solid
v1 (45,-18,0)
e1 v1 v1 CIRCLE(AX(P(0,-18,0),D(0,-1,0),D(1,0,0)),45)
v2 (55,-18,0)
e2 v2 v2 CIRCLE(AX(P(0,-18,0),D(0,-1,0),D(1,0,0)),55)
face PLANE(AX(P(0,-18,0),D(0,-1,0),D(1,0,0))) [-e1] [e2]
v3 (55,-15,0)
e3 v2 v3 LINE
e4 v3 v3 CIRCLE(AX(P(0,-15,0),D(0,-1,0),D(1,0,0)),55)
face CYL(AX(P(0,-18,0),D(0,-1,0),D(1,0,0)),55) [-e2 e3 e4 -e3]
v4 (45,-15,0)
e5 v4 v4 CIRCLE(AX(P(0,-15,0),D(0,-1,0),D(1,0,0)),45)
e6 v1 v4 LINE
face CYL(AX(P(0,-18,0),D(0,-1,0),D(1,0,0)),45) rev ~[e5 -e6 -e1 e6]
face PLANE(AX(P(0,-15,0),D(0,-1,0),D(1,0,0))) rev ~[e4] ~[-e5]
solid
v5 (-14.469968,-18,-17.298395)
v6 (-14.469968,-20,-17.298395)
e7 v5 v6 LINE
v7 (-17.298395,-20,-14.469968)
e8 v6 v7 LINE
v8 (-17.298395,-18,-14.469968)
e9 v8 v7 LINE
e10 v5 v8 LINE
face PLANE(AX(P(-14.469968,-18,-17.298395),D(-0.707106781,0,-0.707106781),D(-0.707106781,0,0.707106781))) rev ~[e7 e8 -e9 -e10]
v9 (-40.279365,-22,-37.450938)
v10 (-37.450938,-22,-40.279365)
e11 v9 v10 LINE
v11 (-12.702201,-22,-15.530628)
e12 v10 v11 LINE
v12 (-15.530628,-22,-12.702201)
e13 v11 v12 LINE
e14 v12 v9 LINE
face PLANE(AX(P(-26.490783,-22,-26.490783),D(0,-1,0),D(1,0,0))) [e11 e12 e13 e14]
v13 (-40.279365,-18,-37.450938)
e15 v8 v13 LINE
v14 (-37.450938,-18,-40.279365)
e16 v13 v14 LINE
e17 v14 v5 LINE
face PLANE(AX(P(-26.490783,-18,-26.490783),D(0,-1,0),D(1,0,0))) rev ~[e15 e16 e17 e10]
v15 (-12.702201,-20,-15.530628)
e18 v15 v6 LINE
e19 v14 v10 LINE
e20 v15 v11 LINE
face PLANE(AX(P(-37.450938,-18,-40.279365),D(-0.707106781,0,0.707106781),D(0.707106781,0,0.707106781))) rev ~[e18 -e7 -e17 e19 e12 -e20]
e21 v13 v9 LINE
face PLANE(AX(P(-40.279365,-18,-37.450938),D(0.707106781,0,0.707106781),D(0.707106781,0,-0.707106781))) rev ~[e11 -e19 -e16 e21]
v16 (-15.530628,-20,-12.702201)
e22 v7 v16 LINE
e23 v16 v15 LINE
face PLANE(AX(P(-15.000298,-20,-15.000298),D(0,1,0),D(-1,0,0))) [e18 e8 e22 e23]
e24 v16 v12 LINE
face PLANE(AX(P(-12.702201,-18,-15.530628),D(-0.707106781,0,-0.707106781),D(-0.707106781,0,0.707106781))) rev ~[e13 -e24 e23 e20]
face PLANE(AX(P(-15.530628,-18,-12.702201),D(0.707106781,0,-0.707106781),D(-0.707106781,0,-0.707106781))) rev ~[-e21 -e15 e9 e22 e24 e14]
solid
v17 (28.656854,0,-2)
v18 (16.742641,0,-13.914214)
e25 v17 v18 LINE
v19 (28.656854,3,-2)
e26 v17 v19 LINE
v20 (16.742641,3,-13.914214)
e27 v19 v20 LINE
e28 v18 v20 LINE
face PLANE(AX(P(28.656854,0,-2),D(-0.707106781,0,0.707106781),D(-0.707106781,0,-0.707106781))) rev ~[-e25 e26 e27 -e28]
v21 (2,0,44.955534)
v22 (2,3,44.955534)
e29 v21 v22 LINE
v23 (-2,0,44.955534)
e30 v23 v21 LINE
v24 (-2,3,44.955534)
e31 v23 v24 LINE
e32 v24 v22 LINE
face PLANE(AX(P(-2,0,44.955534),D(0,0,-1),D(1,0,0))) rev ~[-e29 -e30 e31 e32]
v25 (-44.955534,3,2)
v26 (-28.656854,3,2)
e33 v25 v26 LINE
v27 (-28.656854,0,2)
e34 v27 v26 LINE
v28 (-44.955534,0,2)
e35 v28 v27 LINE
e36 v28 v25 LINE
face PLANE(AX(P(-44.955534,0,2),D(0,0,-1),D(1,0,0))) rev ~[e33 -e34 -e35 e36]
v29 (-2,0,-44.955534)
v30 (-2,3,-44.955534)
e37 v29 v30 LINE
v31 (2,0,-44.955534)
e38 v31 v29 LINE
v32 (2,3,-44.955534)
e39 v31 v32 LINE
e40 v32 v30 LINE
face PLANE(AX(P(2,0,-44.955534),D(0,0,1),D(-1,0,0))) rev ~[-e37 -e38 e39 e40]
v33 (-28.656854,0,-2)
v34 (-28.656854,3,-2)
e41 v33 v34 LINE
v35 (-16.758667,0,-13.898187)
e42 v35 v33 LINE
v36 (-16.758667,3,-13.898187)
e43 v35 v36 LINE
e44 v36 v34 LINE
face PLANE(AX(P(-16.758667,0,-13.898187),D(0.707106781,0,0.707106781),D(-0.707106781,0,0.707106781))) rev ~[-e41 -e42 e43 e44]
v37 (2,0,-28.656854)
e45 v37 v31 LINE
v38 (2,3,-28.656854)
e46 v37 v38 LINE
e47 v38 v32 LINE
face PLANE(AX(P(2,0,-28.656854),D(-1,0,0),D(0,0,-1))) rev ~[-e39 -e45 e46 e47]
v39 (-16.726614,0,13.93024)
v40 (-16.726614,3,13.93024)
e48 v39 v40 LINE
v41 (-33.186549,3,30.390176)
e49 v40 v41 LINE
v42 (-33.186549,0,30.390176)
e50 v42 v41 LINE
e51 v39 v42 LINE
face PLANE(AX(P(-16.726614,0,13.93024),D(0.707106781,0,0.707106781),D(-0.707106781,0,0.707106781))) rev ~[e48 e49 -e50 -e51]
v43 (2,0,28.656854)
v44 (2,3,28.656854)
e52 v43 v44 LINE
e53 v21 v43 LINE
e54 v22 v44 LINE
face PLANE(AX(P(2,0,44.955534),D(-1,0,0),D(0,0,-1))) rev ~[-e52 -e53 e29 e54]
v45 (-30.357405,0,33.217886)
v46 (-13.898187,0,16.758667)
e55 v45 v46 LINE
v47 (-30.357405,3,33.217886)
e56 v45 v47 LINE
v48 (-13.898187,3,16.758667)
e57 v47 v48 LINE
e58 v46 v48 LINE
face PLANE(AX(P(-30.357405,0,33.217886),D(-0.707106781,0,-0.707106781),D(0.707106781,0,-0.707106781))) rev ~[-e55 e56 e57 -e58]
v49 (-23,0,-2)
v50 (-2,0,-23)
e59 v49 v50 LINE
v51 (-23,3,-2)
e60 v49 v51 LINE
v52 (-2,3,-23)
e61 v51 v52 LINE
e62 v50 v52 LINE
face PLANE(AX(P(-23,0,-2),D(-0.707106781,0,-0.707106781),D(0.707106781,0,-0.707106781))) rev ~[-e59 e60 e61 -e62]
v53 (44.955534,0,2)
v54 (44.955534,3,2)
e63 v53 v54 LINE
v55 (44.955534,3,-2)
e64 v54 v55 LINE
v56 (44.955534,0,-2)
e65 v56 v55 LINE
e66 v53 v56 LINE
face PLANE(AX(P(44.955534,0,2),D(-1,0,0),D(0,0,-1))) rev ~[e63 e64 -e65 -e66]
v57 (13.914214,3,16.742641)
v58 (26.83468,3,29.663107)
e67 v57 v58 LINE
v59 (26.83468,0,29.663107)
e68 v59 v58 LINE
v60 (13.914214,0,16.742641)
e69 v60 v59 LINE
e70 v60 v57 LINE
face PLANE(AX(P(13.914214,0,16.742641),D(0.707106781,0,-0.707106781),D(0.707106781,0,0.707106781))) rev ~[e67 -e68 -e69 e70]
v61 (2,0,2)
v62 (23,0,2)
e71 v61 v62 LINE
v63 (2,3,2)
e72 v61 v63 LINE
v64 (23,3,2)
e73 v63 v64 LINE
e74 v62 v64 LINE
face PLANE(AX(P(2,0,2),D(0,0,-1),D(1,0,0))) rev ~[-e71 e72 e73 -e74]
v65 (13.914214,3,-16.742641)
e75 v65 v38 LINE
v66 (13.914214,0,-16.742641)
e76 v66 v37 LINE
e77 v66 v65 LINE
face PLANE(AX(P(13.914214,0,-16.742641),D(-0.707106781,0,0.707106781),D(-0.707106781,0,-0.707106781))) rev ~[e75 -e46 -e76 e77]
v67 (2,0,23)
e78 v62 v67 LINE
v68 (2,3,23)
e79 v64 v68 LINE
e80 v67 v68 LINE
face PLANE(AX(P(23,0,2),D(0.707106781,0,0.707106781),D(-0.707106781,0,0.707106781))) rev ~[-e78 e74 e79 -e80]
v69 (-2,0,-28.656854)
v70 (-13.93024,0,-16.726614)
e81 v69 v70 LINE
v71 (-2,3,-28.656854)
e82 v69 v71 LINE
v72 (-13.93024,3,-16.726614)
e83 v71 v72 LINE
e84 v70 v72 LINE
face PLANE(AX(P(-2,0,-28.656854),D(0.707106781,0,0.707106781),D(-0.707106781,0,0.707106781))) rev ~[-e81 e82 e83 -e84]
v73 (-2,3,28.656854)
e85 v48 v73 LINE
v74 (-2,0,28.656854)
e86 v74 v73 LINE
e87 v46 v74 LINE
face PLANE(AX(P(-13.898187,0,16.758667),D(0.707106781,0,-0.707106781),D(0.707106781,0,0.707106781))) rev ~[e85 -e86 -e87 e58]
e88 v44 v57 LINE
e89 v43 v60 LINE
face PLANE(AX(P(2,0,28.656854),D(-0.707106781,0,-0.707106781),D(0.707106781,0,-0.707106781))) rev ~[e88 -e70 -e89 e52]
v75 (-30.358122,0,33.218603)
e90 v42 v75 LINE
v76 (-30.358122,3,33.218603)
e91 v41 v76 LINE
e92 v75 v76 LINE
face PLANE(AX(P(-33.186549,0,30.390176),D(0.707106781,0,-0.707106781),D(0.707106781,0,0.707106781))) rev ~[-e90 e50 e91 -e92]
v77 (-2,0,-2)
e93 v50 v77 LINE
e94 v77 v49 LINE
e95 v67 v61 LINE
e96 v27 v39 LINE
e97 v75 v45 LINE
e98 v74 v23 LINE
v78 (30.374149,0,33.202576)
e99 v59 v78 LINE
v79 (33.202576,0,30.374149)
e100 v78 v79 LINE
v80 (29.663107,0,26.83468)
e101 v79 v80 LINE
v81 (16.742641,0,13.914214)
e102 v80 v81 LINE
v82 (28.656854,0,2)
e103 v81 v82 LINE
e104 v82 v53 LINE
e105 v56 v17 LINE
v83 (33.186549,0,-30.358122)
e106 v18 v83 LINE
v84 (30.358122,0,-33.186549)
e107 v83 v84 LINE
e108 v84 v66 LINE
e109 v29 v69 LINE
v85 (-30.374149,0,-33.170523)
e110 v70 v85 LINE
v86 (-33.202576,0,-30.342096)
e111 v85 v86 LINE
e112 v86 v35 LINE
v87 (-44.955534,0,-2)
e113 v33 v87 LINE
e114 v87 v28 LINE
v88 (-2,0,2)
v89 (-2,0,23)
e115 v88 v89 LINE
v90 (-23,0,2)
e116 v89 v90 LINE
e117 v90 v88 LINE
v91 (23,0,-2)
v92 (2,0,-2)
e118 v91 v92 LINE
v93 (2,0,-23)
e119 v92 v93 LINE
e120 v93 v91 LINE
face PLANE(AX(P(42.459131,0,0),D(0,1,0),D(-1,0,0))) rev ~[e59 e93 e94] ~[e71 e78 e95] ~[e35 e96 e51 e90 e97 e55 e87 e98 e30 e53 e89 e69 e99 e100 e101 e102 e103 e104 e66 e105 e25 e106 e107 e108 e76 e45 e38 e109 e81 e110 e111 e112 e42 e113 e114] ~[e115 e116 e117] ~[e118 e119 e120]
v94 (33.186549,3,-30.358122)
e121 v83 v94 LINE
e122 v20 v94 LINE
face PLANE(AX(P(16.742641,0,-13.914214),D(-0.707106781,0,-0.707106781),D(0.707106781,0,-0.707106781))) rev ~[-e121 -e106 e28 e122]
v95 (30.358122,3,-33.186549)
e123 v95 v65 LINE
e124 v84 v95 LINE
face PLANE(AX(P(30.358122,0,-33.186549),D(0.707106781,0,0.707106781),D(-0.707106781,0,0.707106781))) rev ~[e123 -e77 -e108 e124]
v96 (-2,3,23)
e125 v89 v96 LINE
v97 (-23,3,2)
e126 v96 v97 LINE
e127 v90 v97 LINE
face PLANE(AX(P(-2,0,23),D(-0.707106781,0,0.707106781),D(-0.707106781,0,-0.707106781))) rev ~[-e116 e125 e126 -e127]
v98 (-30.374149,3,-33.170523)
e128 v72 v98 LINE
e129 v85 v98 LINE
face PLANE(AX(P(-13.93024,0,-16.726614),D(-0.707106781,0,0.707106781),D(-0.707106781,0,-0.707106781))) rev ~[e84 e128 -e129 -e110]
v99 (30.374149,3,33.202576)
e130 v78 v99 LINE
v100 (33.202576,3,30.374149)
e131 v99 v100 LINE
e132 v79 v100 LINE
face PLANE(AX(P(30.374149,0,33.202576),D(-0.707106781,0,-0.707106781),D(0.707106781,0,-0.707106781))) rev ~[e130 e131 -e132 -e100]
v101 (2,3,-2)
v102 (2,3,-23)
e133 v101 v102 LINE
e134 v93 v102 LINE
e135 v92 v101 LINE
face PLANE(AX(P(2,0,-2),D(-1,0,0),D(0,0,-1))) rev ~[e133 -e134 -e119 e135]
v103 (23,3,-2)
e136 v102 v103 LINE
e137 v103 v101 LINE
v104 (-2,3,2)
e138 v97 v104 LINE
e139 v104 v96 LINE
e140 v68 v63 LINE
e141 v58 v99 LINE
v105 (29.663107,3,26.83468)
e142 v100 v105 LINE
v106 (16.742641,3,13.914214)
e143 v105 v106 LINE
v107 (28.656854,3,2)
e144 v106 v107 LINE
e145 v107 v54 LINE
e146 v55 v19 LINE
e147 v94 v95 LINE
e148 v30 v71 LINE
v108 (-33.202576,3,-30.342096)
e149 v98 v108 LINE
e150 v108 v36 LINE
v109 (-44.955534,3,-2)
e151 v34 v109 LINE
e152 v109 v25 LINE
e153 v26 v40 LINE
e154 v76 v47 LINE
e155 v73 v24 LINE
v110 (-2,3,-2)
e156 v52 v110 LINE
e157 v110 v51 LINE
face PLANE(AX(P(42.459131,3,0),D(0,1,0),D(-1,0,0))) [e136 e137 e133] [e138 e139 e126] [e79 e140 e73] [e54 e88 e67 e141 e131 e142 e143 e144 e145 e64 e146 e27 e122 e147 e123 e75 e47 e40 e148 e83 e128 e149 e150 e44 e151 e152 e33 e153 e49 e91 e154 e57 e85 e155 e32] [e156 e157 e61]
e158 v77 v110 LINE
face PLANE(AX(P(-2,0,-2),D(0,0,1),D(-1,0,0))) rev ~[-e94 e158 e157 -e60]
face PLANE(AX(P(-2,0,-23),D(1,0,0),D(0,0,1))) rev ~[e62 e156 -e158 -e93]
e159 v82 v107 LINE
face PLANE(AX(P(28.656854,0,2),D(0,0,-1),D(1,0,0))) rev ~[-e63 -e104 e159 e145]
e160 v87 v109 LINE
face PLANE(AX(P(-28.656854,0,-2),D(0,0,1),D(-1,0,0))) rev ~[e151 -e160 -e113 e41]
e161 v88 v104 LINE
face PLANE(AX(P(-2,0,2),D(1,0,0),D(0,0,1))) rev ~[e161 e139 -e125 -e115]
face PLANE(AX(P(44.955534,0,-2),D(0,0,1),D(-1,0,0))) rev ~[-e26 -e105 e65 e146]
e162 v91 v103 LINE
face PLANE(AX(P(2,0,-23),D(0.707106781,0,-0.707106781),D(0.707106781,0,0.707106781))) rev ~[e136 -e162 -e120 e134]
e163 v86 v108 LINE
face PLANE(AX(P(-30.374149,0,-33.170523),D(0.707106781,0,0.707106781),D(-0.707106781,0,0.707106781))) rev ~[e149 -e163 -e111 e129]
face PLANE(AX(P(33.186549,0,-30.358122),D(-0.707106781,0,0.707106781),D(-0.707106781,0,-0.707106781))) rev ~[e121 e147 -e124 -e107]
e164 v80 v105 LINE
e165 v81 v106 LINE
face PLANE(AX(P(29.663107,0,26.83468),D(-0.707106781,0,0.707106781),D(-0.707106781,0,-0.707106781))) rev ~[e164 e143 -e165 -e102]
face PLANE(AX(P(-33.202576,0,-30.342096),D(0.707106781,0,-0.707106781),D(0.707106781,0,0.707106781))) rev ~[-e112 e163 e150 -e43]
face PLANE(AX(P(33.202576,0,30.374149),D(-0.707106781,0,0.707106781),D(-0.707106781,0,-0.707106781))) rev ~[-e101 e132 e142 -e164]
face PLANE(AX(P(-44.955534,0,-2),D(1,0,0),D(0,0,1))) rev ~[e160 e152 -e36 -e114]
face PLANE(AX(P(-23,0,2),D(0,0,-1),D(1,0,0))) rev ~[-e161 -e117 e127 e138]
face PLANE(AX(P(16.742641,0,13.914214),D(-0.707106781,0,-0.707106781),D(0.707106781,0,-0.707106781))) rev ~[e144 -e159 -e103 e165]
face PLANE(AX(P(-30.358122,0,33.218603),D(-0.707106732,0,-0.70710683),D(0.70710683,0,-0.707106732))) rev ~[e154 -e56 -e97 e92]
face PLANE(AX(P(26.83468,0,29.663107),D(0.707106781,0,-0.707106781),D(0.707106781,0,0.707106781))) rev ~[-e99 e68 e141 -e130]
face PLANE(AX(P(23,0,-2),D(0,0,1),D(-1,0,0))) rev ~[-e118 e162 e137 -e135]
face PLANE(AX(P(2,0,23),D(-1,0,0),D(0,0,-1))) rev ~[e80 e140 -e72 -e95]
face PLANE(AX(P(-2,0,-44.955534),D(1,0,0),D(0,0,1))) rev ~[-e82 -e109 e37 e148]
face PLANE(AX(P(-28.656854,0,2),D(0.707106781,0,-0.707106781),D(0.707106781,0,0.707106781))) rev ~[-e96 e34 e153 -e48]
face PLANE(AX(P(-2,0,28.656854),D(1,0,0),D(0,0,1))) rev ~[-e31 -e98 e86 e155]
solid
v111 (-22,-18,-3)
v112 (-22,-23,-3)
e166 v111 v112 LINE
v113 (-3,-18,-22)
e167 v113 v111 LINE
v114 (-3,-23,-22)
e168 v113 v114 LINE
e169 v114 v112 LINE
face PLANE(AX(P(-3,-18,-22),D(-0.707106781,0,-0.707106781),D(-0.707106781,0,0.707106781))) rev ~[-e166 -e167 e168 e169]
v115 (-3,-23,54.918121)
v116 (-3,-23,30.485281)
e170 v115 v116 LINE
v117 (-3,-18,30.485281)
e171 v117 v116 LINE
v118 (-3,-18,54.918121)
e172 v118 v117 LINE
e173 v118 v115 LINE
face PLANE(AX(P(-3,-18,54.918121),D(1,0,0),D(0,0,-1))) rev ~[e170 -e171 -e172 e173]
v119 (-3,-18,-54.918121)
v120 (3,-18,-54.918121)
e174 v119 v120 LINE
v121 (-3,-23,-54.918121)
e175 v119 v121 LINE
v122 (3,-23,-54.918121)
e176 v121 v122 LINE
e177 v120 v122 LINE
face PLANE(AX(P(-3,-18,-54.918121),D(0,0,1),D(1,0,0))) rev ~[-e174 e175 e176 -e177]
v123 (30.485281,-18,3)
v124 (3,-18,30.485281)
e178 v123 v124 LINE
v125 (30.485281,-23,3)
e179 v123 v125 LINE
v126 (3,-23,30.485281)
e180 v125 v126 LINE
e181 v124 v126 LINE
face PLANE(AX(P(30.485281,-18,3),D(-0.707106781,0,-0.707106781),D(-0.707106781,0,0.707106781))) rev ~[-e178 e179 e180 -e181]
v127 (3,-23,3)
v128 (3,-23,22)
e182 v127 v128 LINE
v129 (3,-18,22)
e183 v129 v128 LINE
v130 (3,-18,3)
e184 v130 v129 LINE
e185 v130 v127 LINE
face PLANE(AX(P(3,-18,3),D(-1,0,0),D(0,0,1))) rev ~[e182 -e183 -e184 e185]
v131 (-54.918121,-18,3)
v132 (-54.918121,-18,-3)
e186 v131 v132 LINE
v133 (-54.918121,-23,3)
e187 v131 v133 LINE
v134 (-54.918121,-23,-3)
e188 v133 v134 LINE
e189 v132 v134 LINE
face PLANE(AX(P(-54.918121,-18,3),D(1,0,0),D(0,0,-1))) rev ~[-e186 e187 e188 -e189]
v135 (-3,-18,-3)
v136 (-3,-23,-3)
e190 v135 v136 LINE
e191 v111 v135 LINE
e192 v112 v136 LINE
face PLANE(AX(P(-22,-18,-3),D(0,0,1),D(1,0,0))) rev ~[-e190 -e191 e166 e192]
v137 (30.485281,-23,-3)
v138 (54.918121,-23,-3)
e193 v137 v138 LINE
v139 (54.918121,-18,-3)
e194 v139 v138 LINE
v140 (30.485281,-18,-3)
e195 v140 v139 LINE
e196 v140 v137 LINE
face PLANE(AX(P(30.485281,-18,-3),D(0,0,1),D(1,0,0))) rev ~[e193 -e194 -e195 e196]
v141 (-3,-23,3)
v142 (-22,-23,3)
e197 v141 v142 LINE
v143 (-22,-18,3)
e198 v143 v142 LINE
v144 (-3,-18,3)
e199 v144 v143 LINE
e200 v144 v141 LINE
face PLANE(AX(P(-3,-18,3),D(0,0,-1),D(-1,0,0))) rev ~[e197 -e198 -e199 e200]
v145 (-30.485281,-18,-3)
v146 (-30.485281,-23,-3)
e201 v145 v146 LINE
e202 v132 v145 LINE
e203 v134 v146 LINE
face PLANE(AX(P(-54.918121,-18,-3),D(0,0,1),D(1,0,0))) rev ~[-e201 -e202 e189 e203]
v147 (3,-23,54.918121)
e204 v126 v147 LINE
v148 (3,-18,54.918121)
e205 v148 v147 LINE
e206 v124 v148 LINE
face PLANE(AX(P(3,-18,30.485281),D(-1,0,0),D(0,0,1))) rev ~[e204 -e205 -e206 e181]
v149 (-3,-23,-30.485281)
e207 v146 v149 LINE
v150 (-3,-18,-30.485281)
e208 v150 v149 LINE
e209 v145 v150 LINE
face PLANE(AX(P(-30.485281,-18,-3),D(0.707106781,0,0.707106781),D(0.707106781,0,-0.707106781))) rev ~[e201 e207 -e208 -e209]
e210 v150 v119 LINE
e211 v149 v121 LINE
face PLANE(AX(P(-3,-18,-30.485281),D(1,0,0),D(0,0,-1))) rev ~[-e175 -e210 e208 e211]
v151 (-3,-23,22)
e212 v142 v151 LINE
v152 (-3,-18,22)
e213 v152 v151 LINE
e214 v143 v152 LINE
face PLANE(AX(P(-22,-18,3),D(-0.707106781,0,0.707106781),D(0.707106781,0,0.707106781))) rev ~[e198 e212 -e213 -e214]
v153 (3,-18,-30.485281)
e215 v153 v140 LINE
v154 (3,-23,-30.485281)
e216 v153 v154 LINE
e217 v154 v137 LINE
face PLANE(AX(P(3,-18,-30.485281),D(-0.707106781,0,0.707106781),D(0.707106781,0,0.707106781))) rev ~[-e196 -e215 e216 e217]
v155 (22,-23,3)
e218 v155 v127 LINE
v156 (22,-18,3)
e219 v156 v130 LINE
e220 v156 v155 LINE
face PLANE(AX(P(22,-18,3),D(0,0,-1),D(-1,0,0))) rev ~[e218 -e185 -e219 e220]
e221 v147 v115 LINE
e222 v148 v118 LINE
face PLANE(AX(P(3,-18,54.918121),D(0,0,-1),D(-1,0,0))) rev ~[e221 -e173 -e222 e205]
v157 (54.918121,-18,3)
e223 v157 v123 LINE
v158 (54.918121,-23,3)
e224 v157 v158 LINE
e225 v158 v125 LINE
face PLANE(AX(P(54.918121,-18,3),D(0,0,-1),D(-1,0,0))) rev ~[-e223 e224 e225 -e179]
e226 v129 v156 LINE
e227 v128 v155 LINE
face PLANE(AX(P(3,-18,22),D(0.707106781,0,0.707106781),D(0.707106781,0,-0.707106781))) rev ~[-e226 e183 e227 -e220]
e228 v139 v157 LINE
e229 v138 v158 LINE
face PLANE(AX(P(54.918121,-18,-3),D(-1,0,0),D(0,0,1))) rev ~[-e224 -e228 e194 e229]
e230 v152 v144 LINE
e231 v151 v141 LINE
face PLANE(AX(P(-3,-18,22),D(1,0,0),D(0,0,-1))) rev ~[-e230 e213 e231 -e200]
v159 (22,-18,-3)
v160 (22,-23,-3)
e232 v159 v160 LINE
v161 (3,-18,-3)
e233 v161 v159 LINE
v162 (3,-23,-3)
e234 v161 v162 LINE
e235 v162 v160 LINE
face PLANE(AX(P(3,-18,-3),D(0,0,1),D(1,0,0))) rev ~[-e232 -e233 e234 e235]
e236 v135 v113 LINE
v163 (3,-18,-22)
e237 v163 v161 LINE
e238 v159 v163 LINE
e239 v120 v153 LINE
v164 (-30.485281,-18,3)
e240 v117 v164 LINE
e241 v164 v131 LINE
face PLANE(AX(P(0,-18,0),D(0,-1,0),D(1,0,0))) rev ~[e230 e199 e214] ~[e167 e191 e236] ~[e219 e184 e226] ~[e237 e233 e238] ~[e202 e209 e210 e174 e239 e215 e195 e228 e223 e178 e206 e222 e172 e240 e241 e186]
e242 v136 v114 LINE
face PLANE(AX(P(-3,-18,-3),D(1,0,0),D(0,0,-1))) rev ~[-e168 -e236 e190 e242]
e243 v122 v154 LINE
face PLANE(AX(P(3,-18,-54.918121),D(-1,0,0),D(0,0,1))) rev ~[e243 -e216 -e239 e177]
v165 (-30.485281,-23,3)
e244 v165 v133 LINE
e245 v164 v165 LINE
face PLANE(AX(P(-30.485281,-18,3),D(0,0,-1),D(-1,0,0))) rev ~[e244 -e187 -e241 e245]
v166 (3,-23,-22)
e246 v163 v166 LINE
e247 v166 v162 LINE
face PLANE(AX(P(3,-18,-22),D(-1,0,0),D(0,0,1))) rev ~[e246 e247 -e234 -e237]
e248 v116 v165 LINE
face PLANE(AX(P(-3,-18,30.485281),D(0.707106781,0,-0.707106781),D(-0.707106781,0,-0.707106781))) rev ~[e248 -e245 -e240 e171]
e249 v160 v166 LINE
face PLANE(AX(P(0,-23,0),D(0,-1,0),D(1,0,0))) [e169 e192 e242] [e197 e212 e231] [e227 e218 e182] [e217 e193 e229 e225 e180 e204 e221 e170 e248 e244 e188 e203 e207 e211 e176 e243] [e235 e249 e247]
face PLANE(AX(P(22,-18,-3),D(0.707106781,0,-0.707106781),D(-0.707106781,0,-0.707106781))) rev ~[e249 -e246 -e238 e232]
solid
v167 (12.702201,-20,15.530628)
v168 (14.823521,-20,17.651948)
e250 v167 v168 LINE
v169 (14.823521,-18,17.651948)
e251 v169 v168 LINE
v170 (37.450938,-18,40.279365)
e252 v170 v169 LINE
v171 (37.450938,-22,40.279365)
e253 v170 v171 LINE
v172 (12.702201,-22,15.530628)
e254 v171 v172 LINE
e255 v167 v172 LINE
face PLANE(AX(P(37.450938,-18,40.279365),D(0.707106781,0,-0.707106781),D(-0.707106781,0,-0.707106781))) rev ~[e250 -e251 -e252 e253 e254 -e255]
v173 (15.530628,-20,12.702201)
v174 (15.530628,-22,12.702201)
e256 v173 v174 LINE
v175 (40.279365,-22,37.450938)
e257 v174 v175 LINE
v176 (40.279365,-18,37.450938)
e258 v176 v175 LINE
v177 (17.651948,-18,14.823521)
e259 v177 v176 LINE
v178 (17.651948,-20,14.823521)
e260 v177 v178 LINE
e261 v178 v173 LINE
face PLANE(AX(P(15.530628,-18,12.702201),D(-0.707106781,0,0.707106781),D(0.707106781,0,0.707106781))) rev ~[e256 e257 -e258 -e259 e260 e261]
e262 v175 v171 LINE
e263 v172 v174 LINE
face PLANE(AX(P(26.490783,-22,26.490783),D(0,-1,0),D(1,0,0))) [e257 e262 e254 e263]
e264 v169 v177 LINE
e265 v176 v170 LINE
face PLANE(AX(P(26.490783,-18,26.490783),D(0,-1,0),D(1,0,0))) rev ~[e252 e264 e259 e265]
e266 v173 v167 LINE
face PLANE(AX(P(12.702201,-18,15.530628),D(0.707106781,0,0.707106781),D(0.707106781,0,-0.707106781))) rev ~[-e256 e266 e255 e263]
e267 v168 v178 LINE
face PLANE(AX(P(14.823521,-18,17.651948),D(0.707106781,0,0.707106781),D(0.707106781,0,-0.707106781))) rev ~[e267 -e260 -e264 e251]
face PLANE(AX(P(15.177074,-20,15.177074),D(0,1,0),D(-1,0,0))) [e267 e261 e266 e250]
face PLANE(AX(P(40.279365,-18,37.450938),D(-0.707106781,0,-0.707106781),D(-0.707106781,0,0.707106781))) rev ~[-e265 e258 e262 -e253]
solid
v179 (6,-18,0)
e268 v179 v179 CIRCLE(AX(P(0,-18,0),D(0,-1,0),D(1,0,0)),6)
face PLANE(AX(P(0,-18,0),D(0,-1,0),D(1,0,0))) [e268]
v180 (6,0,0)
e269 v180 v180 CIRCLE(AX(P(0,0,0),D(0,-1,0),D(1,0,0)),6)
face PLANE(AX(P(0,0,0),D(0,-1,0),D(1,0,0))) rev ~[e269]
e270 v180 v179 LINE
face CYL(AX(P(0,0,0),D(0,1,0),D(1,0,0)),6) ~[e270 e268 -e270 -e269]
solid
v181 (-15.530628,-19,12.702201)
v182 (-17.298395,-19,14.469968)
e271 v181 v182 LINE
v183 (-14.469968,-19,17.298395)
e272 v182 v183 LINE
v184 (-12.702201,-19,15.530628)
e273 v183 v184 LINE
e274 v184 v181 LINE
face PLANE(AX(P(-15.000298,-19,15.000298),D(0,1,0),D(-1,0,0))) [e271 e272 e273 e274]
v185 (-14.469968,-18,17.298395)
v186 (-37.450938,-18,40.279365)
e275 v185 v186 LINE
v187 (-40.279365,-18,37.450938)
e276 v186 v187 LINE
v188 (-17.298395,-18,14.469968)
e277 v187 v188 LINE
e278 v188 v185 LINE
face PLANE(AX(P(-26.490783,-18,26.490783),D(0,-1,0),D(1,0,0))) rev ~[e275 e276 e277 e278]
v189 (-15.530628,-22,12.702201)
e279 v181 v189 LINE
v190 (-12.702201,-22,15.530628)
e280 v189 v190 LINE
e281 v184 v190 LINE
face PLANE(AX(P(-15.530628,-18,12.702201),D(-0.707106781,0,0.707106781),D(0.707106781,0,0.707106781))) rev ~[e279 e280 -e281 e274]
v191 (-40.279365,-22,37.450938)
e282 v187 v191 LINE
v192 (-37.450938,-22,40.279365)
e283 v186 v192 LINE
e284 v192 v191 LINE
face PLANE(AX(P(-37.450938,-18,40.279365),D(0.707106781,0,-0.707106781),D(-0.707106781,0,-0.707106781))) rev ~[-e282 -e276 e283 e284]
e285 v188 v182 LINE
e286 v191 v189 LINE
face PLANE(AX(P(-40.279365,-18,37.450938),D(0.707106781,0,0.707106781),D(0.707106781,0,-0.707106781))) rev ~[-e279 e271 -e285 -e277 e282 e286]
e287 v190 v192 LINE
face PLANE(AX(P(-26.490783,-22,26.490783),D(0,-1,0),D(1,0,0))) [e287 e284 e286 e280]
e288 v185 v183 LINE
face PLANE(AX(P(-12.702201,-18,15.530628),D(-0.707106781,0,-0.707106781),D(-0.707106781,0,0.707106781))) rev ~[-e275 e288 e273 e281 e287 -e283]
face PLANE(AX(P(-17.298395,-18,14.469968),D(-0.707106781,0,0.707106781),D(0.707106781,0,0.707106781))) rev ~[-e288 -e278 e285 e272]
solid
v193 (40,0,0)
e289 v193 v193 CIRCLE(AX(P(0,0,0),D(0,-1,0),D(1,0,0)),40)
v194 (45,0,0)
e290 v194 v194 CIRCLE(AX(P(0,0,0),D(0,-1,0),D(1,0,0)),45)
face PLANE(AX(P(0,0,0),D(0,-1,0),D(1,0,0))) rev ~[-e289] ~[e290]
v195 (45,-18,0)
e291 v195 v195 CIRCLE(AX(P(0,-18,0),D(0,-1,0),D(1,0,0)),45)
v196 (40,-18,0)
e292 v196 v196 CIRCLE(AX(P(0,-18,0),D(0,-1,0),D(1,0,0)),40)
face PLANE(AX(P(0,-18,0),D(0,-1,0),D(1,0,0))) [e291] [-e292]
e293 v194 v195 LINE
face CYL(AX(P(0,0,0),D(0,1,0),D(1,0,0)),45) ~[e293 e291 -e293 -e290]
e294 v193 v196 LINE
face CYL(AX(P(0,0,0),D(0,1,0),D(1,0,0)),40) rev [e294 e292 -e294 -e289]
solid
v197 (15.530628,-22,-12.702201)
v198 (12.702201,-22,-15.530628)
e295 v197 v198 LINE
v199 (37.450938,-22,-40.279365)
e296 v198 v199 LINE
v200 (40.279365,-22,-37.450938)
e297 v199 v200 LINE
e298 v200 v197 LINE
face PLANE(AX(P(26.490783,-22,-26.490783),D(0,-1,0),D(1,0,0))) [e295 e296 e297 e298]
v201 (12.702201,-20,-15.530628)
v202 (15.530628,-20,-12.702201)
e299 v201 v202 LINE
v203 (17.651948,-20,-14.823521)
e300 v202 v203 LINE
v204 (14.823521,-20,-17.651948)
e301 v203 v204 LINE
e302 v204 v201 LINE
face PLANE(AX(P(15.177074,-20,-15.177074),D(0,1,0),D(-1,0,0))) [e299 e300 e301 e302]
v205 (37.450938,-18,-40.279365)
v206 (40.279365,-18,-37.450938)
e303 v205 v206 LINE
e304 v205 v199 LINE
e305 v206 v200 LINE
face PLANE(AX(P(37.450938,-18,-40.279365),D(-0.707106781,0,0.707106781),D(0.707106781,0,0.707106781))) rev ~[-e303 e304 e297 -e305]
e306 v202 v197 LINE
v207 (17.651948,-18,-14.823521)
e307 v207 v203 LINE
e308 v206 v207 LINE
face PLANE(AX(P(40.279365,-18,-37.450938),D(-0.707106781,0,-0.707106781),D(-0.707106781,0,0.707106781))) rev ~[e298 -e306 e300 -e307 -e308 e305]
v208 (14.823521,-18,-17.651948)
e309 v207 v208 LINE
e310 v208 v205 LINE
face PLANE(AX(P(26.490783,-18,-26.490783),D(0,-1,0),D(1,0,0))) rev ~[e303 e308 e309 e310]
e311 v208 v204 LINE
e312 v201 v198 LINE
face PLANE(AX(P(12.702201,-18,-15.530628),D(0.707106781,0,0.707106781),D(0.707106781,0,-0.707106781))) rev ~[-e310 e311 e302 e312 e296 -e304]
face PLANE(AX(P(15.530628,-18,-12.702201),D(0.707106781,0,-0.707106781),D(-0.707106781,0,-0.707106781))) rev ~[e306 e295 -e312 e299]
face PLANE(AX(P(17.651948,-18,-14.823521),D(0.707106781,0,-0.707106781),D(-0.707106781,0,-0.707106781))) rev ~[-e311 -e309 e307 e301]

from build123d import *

# Parameters (mm, degrees)
F0_R      = 6
F1_DEPTH  = 18
F0_R_2    = 45
F0_R_3    = 40
F2_R      = 55
F2_R_2    = 45
F3_DEPTH  = 3
F4_W      = 6
F4_H      = 6
F5_DEPTH  = 5
F7_DEPTH  = 4
F9_DEPTH  = 1
F11_DEPTH = 2
F13_DEPTH = 2
F15_DEPTH = 2
F16_W     = 4
F16_H     = 4
F17_DEPTH = 3


with BuildPart() as f1:
    # F0 (on Front) → F1 (new body)
    with BuildSketch(Plane.XZ):
        Circle(F0_R)
    extrude(amount=F1_DEPTH)


with BuildPart() as f1b:
    # F0 (on Front) → F1, piece 2 (new body)
    with BuildSketch(Plane.XZ):
        Circle(F0_R_2)
        Circle(F0_R_3, mode=Mode.SUBTRACT)
    extrude(amount=F1_DEPTH)


with BuildPart() as f3:
    # F2 (on face) → F3 (new body)
    with BuildSketch(Plane.XZ.offset(18)):
        Circle(F2_R)
        Circle(F2_R_2, mode=Mode.SUBTRACT)
    extrude(amount=-F3_DEPTH)


with BuildPart() as f5:
    # F4 (on face) → F5 (new body)
    with BuildSketch(Plane.XZ.offset(18)):
        Rectangle(F4_W, F4_H)
        with BuildLine():
            Line((-54.918120871, 3), (-54.918120871, -3))
            Line((-54.918120871, -3), (-44.8998886413, -3))
            ThreePointArc((-44.8998886413, -3), (-45, 0), (-44.8998886413, 3))
            Line((-44.8998886413, 3), (-54.918120871, 3))
        make_face()
        Polygon((-25, 0), (-22, -3), (-3, -3), (-3, 3), (-22, 3), align=None)
        Polygon((3, -3), (-3, -3), (-3, -22), (0, -25), (3, -22), align=None)
        Polygon((3, 3), (3, -3), (22, -3), (25, 0), (22, 3), align=None)
        with BuildLine():
            Line((44.8998886413, -3), (54.918120871, -3))
            Line((54.918120871, -3), (54.918120871, 3))
            Line((54.918120871, 3), (44.8998886413, 3))
            ThreePointArc((44.8998886413, 3), (44.9749651965, 1.500834958), (45, 0))
            ThreePointArc((45, 0), (44.9749651965, -1.500834958), (44.8998886413, -3))
        make_face()
        with BuildLine():
            Line((3, 54.918120871), (-3, 54.918120871))
            Line((-3, 54.918120871), (-3, 44.8998886413))
            ThreePointArc((-3, 44.8998886413), (0, 45), (3, 44.8998886413))
            Line((3, 44.8998886413), (3, 54.918120871))
        make_face()
        with BuildLine():
            Line((-3, -44.8998886413), (-3, -54.918120871))
            Line((-3, -54.918120871), (3, -54.918120871))
            Line((3, -54.918120871), (3, -44.8998886413))
            ThreePointArc((3, -44.8998886413), (0, -45), (-3, -44.8998886413))
        make_face()
        Polygon((-3, 22), (-3, 3), (3, 3), (3, 22), (0, 25), align=None)
        with BuildLine():
            ThreePointArc((-44.8998886413, 3), (-45, 0), (-44.8998886413, -3))
            Line((-44.8998886413, -3), (-30.4852813742, -3))
            Line((-30.4852813742, -3), (-33.4852813742, 0))
            Line((-33.4852813742, 0), (-30.4852813742, 3))
            Line((-30.4852813742, 3), (-44.8998886413, 3))
        make_face()
        Polygon((-33.4852813742, 0), (-30.4852813742, -3), (-22, -3), (-25, 0), (-22, 3), (-30.4852813742, 3), align=None)
        Polygon((-3, 30.4852813742), (-30.4852813742, 3), (-22, 3), (-3, 22), align=None)
        Polygon((-22, -3), (-30.4852813742, -3), (-3, -30.4852813742), (-3, -22), align=None)
        Polygon((3, -22), (3, -30.4852813742), (30.4852813742, -3), (22, -3), align=None)
        Polygon((-3, -22), (-3, -30.4852813742), (0, -33.4852813742), (3, -30.4852813742), (3, -22), (0, -25), align=None)
        with BuildLine():
            Line((-3, -30.4852813742), (-3, -44.8998886413))
            ThreePointArc((-3, -44.8998886413), (0, -45), (3, -44.8998886413))
            Line((3, -44.8998886413), (3, -30.4852813742))
            Line((3, -30.4852813742), (0, -33.4852813742))
            Line((0, -33.4852813742), (-3, -30.4852813742))
        make_face()
        Polygon((30.4852813742, 3), (3, 30.4852813742), (3, 22), (22, 3), align=None)
        Polygon((22, -3), (30.4852813742, -3), (33.4852813742, 0), (30.4852813742, 3), (22, 3), (25, 0), align=None)
        Polygon((0, 33.4852813742), (-3, 30.4852813742), (-3, 22), (0, 25), (3, 22), (3, 30.4852813742), align=None)
        with BuildLine():
            ThreePointArc((3, 44.8998886413), (0, 45), (-3, 44.8998886413))
            Line((-3, 44.8998886413), (-3, 30.4852813742))
            Line((-3, 30.4852813742), (0, 33.4852813742))
            Line((0, 33.4852813742), (3, 30.4852813742))
            Line((3, 30.4852813742), (3, 44.8998886413))
        make_face()
        with BuildLine():
            Line((30.4852813742, -3), (44.8998886413, -3))
            ThreePointArc((44.8998886413, -3), (44.9749651965, -1.500834958), (45, 0))
            ThreePointArc((45, 0), (44.9749651965, 1.500834958), (44.8998886413, 3))
            Line((44.8998886413, 3), (30.4852813742, 3))
            Line((30.4852813742, 3), (33.4852813742, 0))
            Line((33.4852813742, 0), (30.4852813742, -3))
        make_face()
    extrude(amount=F5_DEPTH)


with BuildPart() as f7:
    # F6 (on face) → F7 (new body)
    with BuildSketch(Plane.XZ.offset(18)):
        Polygon((-40.279365048, 37.4509379232), (-15.5306277065, 12.7022005817), (-12.7022005817, 15.5306277065), (-37.4509379232, 40.279365048), align=None)
    extrude(amount=F7_DEPTH)

    # F8 (on face) → F9 (cut)
    with BuildSketch(Plane(origin=(0, -18, 0), x_dir=(-1, 0, 0), z_dir=(0, 1, 0))):
        Polygon((17.2983946594, 14.4699675347), (14.4699675347, 17.2983946594), (12.7022005817, 15.5306277065), (15.5306277065, 12.7022005817), align=None)
    extrude(amount=-F9_DEPTH, mode=Mode.SUBTRACT)


with BuildPart() as f7b:
    # F6 (on face) → F7, piece 2 (new body)
    with BuildSketch(Plane.XZ.offset(18)):
        Polygon((-15.5306277065, -12.7022005817), (-40.279365048, -37.4509379232), (-37.4509379232, -40.279365048), (-12.7022005817, -15.5306277065), align=None)
    extrude(amount=F7_DEPTH)

    # F10 (on face) → F11 (cut)
    with BuildSketch(Plane(origin=(0, -18, 0), x_dir=(-1, 0, 0), z_dir=(0, 1, 0))):
        Polygon((17.2983946594, -14.4699675347), (15.5306277065, -12.7022005817), (12.7022005817, -15.5306277065), (14.4699675347, -17.2983946594), align=None)
    extrude(amount=-F11_DEPTH, mode=Mode.SUBTRACT)


with BuildPart() as f7c:
    # F6 (on face) → F7, piece 3 (new body)
    with BuildSketch(Plane.XZ.offset(18)):
        Polygon((12.7022005817, -15.5306277065), (37.4509379232, -40.279365048), (40.279365048, -37.4509379232), (15.5306277065, -12.7022005817), align=None)
    extrude(amount=F7_DEPTH)

    # F12 (on face) → F13 (cut)
    with BuildSketch(Plane(origin=(0, -18, 0), x_dir=(-1, 0, 0), z_dir=(0, 1, 0))):
        Polygon((-14.8235209253, -17.65194805), (-12.7022005817, -15.5306277065), (-15.5306277065, -12.7022005817), (-17.65194805, -14.8235209253), align=None)
    extrude(amount=-F13_DEPTH, mode=Mode.SUBTRACT)


with BuildPart() as f7d:
    # F6 (on face) → F7, piece 4 (new body)
    with BuildSketch(Plane.XZ.offset(18)):
        Polygon((15.5306277065, 12.7022005817), (40.279365048, 37.4509379232), (37.4509379232, 40.279365048), (12.7022005817, 15.5306277065), align=None)
    extrude(amount=F7_DEPTH)

    # F14 (on face) → F15 (cut)
    with BuildSketch(Plane(origin=(0, -18, 0), x_dir=(-1, 0, 0), z_dir=(0, 1, 0))):
        Polygon((-15.5306277065, 12.7022005817), (-12.7022005817, 15.5306277065), (-14.8235209253, 17.65194805), (-17.65194805, 14.8235209253), align=None)
    extrude(amount=-F15_DEPTH, mode=Mode.SUBTRACT)


with BuildPart() as f17:
    # F16 (on face) → F17 (new body)
    with BuildSketch(Plane(origin=(0, 0, 0), x_dir=(-1, 0, 0), z_dir=(0, 1, 0))):
        with BuildLine():
            Line((-44.955533586, 2), (-44.955533586, -2))
            Line((-44.955533586, -2), (-39.9499687109, -2))
            ThreePointArc((-39.9499687109, -2), (-40, 0), (-39.9499687109, 2))
            Line((-39.9499687109, 2), (-44.955533586, 2))
        make_face()
        with BuildLine():
            ThreePointArc((-39.9499687109, 2), (-40, 0), (-39.9499687109, -2))
            Line((-39.9499687109, -2), (-28.6568542495, -2))
            Line((-28.6568542495, -2), (-30.6568542495, 0))
            Line((-30.6568542495, 0), (-28.6568542495, 2))
            Line((-28.6568542495, 2), (-39.9499687109, 2))
        make_face()
        with BuildLine():
            Line((-2, -39.9499687109), (-2, -44.955533586))
            Line((-2, -44.955533586), (2, -44.955533586))
            Line((2, -44.955533586), (2, -39.9499687109))
            ThreePointArc((2, -39.9499687109), (0, -40), (-2, -39.9499687109))
        make_face()
        Polygon((-30.6568542495, 0), (-28.6568542495, -2), (-23, -2), (-25, 0), (-23, 2), (-28.6568542495, 2), align=None)
        Polygon((-23, -2), (-28.6568542495, -2), (-16.7426406871, -13.9142135624), (-13.9142135624, -16.7426406871), (-2, -28.6568542495), (-2, -23), align=None)
        with BuildLine():
            ThreePointArc((-26.8346802213, -29.663107346), (-28.2842712475, -28.2842712475), (-29.663107346, -26.8346802213))
            Line((-29.663107346, -26.8346802213), (-33.1865494443, -30.3581223196))
            Line((-33.1865494443, -30.3581223196), (-30.3581223196, -33.1865494443))
            Line((-30.3581223196, -33.1865494443), (-26.8346802213, -29.663107346))
        make_face()
        with BuildLine():
            Line((-16.7426406871, -13.9142135624), (-29.663107346, -26.8346802213))
            ThreePointArc((-29.663107346, -26.8346802213), (-28.2842712475, -28.2842712475), (-26.8346802213, -29.663107346))
            Line((-26.8346802213, -29.663107346), (-13.9142135624, -16.7426406871))
            Line((-13.9142135624, -16.7426406871), (-16.7426406871, -13.9142135624))
        make_face()
        with BuildLine():
            Line((-30.3741490881, 33.2025762129), (-33.2025762129, 30.3741490881))
            Line((-33.2025762129, 30.3741490881), (-29.663107346, 26.8346802213))
            ThreePointArc((-29.663107346, 26.8346802213), (-28.2842712475, 28.2842712475), (-26.8346802213, 29.663107346))
            Line((-26.8346802213, 29.663107346), (-30.3741490881, 33.2025762129))
        make_face()
        with BuildLine():
            Line((-2, -28.6568542495), (-2, -39.9499687109))
            ThreePointArc((-2, -39.9499687109), (0, -40), (2, -39.9499687109))
            Line((2, -39.9499687109), (2, -28.6568542495))
            Line((2, -28.6568542495), (0, -30.6568542495))
            Line((0, -30.6568542495), (-2, -28.6568542495))
        make_face()
        Polygon((-25, 0), (-23, -2), (-2, -2), (-2, 2), (-23, 2), align=None)
        Polygon((-16.7426406871, 13.9142135624), (-28.6568542495, 2), (-23, 2), (-2, 23), (-2, 28.6568542495), (-13.9142135624, 16.7426406871), align=None)
        with BuildLine():
            ThreePointArc((-26.8346802213, 29.663107346), (-28.2842712475, 28.2842712475), (-29.663107346, 26.8346802213))
            Line((-29.663107346, 26.8346802213), (-16.7426406871, 13.9142135624))
            Line((-16.7426406871, 13.9142135624), (-13.9142135624, 16.7426406871))
            Line((-13.9142135624, 16.7426406871), (-26.8346802213, 29.663107346))
        make_face()
        with BuildLine():
            Line((39.9499687109, -2), (44.955533586, -2))
            Line((44.955533586, -2), (44.955533586, 2))
            Line((44.955533586, 2), (39.9499687109, 2))
            ThreePointArc((39.9499687109, 2), (39.9874902215, 1.0003128423), (40, 0))
            ThreePointArc((40, 0), (39.9874902215, -1.0003128423), (39.9499687109, -2))
        make_face()
        Polygon((-2, -23), (-2, -28.6568542495), (0, -30.6568542495), (2, -28.6568542495), (2, -23), (0, -25), align=None)
        Rectangle(F16_W, F16_H)
        Polygon((2, -2), (-2, -2), (-2, -23), (0, -25), (2, -23), align=None)
        with BuildLine():
            Line((2, 44.955533586), (-2, 44.955533586))
            Line((-2, 44.955533586), (-2, 39.9499687109))
            ThreePointArc((-2, 39.9499687109), (0, 40), (2, 39.9499687109))
            Line((2, 39.9499687109), (2, 44.955533586))
        make_face()
        Polygon((2, -23), (2, -28.6568542495), (13.9302403309, -16.7266139185), (16.7586674557, -13.8981867938), (28.6568542495, -2), (23, -2), align=None)
        with BuildLine():
            ThreePointArc((29.6783272148, -26.8178465529), (28.3003135351, -28.2682198558), (26.8515047742, -29.6478783618))
            Line((26.8515047742, -29.6478783618), (30.3741490881, -33.1705226757))
            Line((30.3741490881, -33.1705226757), (33.2025762129, -30.342095551))
            Line((33.2025762129, -30.342095551), (29.6783272148, -26.8178465529))
        make_face()
        with BuildLine():
            Line((13.9302403309, -16.7266139185), (26.8515047742, -29.6478783618))
            ThreePointArc((26.8515047742, -29.6478783618), (28.3003135351, -28.2682198558), (29.6783272148, -26.8178465529))
            Line((29.6783272148, -26.8178465529), (16.7586674557, -13.8981867938))
            Line((16.7586674557, -13.8981867938), (13.9302403309, -16.7266139185))
        make_face()
        with BuildLine():
            Line((28.6568542495, -2), (39.9499687109, -2))
            ThreePointArc((39.9499687109, -2), (39.9874902215, -1.0003128423), (40, 0))
            ThreePointArc((40, 0), (39.9874902215, 1.0003128423), (39.9499687109, 2))
            Line((39.9499687109, 2), (28.6568542495, 2))
            Line((28.6568542495, 2), (30.6568542495, 0))
            Line((30.6568542495, 0), (28.6568542495, -2))
        make_face()
        Polygon((2, 2), (2, -2), (23, -2), (25, 0), (23, 2), align=None)
        Polygon((-2, 23), (-2, 2), (2, 2), (2, 23), (0, 25), align=None)
        Polygon((-2, 28.6568542495), (-2, 23), (0, 25), (2, 23), (2, 28.6568542495), (0, 30.6568542495), align=None)
        with BuildLine():
            ThreePointArc((2, 39.9499687109), (0, 40), (-2, 39.9499687109))
            Line((-2, 39.9499687109), (-2, 28.6568542495))
            Line((-2, 28.6568542495), (0, 30.6568542495))
            Line((0, 30.6568542495), (2, 28.6568542495))
            Line((2, 28.6568542495), (2, 39.9499687109))
        make_face()
        Polygon((23, -2), (28.6568542495, -2), (30.6568542495, 0), (28.6568542495, 2), (23, 2), (25, 0), align=None)
        with BuildLine():
            ThreePointArc((30.357405266, 33.2178859279), (30.3657781419, 33.2102321256), (30.3741490881, 33.2025762129))
            Line((30.3741490881, 33.2025762129), (30.3581223196, 33.2186029814))
            Line((30.3581223196, 33.2186029814), (30.357405266, 33.2178859279))
        make_face()
        with BuildLine():
            Line((33.1865494443, 30.3901758567), (30.3741490881, 33.2025762129))
            ThreePointArc((30.3741490881, 33.2025762129), (30.3657781419, 33.2102321256), (30.357405266, 33.2178859279))
            Line((30.357405266, 33.2178859279), (26.8178465529, 29.6783272148))
            ThreePointArc((26.8178465529, 29.6783272148), (28.2682198558, 28.3003135351), (29.6478783618, 26.8515047742))
            Line((29.6478783618, 26.8515047742), (33.1865494443, 30.3901758567))
        make_face()
        Polygon((23, 2), (28.6568542495, 2), (16.7266139185, 13.9302403309), (13.8981867938, 16.7586674557), (2, 28.6568542495), (2, 23), align=None)
        with BuildLine():
            Line((16.7266139185, 13.9302403309), (29.6478783618, 26.8515047742))
            ThreePointArc((29.6478783618, 26.8515047742), (28.2682198558, 28.3003135351), (26.8178465529, 29.6783272148))
            Line((26.8178465529, 29.6783272148), (13.8981867938, 16.7586674557))
            Line((13.8981867938, 16.7586674557), (16.7266139185, 13.9302403309))
        make_face()
    extrude(amount=F17_DEPTH)


solid = Compound([f1.part, f1b.part, f3.part, f5.part, f7.part, f7b.part, f7c.part, f7d.part, f17.part])
